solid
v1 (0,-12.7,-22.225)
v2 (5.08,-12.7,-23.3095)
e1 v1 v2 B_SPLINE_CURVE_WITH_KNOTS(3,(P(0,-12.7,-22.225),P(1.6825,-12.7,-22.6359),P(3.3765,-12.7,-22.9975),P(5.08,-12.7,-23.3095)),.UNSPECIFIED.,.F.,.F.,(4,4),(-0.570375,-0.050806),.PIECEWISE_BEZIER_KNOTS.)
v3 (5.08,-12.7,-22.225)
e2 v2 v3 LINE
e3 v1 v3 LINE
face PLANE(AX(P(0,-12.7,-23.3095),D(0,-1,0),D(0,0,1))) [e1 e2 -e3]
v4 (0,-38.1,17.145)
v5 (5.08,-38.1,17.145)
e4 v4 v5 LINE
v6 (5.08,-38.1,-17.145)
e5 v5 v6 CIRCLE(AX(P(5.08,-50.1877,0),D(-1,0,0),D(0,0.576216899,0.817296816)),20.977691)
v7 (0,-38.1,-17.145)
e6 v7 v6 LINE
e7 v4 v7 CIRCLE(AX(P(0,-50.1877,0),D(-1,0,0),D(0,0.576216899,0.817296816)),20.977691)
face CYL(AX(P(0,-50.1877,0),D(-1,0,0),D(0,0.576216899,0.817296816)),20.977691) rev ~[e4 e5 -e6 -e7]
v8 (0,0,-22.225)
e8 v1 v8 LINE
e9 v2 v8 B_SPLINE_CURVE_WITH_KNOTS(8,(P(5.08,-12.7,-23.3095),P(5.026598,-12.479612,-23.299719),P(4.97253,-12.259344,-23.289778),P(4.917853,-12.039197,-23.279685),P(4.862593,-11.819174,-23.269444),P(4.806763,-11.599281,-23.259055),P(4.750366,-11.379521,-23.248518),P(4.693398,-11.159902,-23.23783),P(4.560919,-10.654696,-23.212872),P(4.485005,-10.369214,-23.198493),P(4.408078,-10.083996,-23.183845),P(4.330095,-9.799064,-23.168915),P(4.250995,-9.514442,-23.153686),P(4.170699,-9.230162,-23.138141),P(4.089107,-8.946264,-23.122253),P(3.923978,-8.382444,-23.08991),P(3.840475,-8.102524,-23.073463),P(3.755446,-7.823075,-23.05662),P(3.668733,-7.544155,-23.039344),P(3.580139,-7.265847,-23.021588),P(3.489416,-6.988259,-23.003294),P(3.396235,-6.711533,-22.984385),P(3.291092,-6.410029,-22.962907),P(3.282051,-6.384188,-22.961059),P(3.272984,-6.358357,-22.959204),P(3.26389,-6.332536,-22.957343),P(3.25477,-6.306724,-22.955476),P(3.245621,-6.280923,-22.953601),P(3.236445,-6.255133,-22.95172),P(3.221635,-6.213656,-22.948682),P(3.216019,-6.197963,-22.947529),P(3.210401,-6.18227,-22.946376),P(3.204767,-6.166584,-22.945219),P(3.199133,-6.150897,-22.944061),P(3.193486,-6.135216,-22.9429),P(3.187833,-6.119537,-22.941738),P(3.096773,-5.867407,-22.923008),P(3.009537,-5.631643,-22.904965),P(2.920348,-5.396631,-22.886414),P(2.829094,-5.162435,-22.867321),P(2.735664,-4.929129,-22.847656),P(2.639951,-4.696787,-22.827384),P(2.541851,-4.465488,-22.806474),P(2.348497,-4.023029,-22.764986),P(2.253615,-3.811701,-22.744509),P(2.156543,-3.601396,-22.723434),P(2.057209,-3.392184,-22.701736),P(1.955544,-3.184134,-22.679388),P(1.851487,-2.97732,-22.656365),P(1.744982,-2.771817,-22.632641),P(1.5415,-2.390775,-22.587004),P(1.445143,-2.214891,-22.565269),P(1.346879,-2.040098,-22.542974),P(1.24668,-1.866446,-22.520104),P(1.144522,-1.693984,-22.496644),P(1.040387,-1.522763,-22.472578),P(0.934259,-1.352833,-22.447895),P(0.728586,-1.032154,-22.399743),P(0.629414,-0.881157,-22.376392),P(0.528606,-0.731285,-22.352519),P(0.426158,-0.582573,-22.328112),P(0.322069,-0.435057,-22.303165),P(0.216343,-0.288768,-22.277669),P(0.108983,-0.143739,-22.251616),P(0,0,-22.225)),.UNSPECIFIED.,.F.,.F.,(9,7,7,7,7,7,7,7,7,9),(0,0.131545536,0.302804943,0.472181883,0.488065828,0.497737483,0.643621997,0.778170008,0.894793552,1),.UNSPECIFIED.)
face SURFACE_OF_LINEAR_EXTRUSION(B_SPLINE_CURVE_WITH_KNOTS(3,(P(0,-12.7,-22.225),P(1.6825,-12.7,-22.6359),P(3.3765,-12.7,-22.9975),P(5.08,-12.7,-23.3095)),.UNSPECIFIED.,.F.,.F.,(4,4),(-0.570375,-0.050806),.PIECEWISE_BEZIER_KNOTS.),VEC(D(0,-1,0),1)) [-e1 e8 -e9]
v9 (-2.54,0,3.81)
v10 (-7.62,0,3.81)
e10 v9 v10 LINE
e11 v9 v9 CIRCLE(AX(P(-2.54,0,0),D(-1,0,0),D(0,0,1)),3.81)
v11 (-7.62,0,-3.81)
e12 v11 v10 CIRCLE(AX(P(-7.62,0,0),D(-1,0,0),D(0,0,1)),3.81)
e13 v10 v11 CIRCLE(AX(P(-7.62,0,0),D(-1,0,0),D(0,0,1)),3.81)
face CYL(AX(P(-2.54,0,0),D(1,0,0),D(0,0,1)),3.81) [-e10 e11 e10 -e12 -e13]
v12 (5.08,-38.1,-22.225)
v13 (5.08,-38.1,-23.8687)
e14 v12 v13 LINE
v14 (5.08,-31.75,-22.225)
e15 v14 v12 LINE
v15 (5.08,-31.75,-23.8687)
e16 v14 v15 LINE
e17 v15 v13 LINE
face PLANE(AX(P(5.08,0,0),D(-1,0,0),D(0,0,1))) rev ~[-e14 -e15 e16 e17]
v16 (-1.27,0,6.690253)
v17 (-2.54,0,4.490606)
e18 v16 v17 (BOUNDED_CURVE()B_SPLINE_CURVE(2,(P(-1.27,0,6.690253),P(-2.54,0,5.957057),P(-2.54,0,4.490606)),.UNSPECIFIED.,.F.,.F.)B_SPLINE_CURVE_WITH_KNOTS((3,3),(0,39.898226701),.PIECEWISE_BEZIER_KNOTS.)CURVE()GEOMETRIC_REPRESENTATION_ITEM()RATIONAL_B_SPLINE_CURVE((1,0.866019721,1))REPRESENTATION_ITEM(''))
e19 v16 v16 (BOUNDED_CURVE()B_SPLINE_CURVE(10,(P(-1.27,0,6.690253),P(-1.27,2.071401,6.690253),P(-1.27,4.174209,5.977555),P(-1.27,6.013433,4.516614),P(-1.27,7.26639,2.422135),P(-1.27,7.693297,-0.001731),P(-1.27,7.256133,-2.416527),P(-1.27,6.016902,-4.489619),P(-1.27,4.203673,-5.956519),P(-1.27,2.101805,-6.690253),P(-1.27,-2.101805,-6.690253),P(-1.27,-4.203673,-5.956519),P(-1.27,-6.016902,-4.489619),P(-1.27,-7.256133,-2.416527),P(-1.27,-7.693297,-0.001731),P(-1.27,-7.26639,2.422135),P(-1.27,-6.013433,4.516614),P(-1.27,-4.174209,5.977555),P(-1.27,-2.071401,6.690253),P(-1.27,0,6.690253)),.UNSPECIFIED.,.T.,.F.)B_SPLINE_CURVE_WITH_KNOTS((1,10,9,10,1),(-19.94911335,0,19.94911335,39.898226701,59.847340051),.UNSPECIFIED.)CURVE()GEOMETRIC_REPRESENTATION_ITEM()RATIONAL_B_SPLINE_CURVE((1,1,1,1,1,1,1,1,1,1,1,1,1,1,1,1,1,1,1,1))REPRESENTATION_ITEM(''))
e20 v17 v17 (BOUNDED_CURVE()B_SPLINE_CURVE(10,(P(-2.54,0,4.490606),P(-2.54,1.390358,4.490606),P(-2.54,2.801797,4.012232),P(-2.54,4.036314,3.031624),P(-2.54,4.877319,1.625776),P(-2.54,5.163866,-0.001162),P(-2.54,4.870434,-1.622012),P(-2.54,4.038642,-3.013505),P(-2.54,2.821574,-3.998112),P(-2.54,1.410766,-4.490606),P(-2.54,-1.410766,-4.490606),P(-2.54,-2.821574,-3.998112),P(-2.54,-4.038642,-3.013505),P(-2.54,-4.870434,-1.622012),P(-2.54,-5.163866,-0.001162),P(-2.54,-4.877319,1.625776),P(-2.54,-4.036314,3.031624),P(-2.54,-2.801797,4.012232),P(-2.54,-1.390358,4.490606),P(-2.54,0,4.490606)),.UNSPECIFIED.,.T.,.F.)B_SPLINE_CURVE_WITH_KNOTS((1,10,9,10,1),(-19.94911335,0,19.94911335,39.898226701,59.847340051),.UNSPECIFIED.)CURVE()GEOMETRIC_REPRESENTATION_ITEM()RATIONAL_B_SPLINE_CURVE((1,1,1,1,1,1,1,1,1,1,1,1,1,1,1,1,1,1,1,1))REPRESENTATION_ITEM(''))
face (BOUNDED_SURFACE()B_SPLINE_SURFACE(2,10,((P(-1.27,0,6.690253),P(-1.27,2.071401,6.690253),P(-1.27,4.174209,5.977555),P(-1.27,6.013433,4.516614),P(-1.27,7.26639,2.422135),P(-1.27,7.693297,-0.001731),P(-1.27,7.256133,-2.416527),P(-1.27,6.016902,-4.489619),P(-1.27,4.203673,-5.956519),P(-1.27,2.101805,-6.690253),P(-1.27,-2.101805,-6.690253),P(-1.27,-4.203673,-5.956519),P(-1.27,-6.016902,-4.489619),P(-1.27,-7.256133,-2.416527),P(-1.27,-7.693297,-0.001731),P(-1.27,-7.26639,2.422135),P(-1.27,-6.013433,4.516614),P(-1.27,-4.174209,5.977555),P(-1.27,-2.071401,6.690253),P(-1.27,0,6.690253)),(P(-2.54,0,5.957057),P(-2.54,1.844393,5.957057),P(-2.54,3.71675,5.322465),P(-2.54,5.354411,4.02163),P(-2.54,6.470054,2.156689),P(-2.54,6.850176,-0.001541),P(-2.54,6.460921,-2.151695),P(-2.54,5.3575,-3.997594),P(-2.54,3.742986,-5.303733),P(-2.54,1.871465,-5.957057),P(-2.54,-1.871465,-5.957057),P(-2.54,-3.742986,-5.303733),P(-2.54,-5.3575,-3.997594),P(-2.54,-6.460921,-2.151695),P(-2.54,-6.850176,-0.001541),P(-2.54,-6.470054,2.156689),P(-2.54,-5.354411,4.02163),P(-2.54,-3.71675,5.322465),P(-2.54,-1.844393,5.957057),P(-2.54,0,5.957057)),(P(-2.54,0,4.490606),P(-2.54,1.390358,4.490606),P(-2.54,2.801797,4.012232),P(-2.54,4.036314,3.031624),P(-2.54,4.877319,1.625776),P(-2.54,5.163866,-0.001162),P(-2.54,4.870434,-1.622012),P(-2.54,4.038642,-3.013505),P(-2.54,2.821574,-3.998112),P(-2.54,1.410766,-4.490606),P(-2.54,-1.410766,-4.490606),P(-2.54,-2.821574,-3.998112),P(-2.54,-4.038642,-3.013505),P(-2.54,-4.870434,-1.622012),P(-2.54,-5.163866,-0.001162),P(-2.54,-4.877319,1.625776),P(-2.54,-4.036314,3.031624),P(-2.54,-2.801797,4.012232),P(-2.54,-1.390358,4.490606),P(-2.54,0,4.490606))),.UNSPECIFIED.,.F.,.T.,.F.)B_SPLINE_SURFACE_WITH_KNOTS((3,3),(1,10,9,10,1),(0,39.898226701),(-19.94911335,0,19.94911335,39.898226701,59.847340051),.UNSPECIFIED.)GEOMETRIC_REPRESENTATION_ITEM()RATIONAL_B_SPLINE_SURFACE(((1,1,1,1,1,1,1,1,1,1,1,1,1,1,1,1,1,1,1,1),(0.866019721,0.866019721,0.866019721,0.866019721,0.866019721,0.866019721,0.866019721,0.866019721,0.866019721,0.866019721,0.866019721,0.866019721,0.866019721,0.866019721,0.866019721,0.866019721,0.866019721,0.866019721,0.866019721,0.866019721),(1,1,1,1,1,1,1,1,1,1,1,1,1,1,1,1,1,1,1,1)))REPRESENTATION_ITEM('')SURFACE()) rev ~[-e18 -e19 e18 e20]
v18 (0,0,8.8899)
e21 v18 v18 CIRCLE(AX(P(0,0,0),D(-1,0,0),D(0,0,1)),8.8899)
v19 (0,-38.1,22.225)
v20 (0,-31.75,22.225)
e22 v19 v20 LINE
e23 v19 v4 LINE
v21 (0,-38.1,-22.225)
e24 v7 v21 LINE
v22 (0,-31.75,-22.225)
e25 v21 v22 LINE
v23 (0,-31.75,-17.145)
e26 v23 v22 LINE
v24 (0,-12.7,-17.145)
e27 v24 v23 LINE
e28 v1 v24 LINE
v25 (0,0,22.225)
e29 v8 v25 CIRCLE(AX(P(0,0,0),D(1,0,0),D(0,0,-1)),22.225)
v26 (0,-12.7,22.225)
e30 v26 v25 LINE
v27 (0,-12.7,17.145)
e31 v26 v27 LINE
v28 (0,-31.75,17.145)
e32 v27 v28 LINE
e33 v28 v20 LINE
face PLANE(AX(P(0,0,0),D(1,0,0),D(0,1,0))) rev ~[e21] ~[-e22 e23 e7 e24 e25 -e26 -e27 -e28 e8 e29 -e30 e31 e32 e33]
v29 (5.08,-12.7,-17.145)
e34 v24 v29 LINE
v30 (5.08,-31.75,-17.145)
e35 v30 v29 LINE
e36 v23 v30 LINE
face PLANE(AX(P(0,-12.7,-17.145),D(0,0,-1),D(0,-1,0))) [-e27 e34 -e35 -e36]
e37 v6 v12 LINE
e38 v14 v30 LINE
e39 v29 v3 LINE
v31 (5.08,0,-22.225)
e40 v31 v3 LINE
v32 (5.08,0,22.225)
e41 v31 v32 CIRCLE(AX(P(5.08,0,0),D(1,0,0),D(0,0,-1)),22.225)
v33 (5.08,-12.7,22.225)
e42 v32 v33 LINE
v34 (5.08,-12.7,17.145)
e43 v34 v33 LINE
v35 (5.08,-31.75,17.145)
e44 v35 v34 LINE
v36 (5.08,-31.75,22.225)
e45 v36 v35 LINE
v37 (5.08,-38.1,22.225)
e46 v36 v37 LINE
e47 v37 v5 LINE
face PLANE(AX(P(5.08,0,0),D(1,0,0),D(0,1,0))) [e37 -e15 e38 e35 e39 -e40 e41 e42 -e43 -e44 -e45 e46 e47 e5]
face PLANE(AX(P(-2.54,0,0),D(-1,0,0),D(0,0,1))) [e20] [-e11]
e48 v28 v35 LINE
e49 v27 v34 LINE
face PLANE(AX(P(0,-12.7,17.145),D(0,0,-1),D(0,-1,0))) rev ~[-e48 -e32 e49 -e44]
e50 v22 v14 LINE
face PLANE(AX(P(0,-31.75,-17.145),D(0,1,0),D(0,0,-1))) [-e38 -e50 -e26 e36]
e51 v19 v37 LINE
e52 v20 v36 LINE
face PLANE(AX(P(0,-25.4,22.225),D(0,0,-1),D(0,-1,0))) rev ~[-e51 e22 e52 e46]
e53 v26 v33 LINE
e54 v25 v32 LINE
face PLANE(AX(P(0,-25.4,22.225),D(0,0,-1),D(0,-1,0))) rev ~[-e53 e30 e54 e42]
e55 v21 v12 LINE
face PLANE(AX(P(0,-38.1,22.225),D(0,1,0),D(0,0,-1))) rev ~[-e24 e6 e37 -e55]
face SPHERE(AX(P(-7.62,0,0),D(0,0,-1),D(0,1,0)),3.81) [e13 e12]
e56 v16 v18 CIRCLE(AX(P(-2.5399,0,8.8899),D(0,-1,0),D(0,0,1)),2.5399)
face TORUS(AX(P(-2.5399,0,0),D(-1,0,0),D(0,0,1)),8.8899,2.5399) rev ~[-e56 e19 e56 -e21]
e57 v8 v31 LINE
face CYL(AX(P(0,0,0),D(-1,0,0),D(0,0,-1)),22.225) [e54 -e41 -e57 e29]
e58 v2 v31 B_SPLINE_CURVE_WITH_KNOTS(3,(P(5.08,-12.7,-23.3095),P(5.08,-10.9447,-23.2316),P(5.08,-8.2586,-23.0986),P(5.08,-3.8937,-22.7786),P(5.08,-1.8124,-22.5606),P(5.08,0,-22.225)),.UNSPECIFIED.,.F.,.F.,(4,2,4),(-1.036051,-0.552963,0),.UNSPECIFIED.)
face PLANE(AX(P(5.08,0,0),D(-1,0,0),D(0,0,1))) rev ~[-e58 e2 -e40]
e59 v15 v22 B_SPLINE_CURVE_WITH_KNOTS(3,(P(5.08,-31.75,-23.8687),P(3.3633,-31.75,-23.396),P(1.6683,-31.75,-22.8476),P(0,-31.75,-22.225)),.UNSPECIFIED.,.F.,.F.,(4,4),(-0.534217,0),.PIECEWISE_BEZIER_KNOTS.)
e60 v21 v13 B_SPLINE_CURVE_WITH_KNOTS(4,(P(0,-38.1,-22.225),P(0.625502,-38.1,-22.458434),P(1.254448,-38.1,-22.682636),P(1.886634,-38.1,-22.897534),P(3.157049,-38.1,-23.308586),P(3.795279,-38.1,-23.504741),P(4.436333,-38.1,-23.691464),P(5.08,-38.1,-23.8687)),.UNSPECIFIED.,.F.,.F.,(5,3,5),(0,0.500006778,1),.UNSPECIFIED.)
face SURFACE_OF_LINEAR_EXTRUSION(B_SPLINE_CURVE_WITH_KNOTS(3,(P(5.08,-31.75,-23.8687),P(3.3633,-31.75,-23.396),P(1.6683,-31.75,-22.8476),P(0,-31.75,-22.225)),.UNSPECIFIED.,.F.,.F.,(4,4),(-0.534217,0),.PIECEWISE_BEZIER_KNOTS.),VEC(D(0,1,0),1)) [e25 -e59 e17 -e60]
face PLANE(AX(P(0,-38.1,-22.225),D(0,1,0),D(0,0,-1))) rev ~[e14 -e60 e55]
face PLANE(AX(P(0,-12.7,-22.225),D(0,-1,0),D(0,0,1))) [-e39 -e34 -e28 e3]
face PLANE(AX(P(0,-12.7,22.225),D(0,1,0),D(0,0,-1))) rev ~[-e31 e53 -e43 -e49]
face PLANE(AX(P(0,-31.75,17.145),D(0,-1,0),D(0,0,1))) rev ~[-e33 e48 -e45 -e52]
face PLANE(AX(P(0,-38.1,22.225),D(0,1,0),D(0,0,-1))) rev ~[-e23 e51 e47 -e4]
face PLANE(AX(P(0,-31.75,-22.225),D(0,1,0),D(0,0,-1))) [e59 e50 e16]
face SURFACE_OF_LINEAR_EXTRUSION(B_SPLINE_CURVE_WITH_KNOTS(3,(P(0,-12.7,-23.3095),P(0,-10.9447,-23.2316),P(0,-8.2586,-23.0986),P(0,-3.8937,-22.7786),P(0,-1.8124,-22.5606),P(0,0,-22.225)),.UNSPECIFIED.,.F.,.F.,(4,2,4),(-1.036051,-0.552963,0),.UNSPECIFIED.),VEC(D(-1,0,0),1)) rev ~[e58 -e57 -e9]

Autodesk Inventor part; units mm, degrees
ref_plane "YZ Plane" through (0, 0, 0) normal (1, 0, 0) x (0, 1, 0)
ref_plane "XZ Plane" through (0, 0, 0) normal (0, 1, 0) x (-1, 0, 0)
ref_plane "XY Plane" through (0, 0, 0) normal (0, 0, 1) x (1, 0, 0)
sketch "Sketch1" plane through (0, 0, 0) normal (1, 0, 0) x (0, 1, 0)
  line L0 (-25.4, -22.225) -> (0, -22.225)
  line L1 (0, -22.225) -> (0, 22.225) construction
  line L2 (0, 22.225) -> (-25.4, 22.225)
  line L3 (-25.4, 22.225) -> (-25.4, -22.225) construction
  line L4 (-25.4, 0) -> (0, 0) construction
  arc A0 (0, -22.225) -> (0, 22.225) centre (0, 0) ccw
  circle A1 centre (-25.4, 0) radius 3.81 construction
  circle A2 centre (0, 0) radius 3.81
  line L5 (-25.4, 22.225) -> (-38.1, 22.225)
  line L6 (-38.1, 22.225) -> (-38.1, -22.225)
  line L7 (-38.1, -22.225) -> (-25.4, -22.225)
  line L8 (0, -5.7) -> (0, 5.7) construction
  line L9 (5.6896, 0) -> (-18.1104, 0) construction
  point P0 (0, 0)
  dimension "d0" = 25.4
  dimension "d1" = 44.45
  dimension "d2" = 7.62
  dimension "d3" = 12.7
extrude "Extrusion1" add sketch "Sketch1" along normal blind 5.08 contours L7 L6 L5 L2 A0 L0 | A2
sketch "Sketch2" plane through (0, 0, 0) normal (-1, 0, 0) x (0, 0, 1)
  line L0 (-22.225, -38.1) -> (-22.225, 0) projected
  line L1 (22.225, -38.1) -> (-22.225, -38.1) projected
  line L2 (22.225, 0) -> (22.225, -38.1) projected
  line L3 (-22.225, 0) -> (22.225, 0) construction
  line L4 (-22.225, -12.7) -> (-17.145, -12.7)
  line L5 (-17.145, -12.7) -> (-17.145, -31.75)
  line L6 (-17.145, -31.75) -> (-22.225, -31.75)
  line L7 (-22.225, -31.75) -> (-22.225, -12.7)
  line L8 (22.225, -12.7) -> (17.145, -12.7)
  line L9 (17.145, -12.7) -> (17.145, -31.75)
  line L10 (17.145, -31.75) -> (22.225, -31.75)
  line L11 (22.225, -31.75) -> (22.225, -12.7)
  line L12 (0, -38.1) -> (0, 0)
  dimension "d12" = 38.1
  dimension "d13" = 5.08
  dimension "d14" = 5.08
  dimension "d15" = 19.05
  dimension "d16" = 12.7
extrude "Extrusion2" cut sketch "Sketch2" against normal through all
sketch "Sketch3" plane through (0, 0, 0) normal (-1, 0, 0) x (0, 0, 1)
  arc A0 (22.225, 0) -> (-22.225, 0) centre (0, 0) ccw projected
  circle A1 centre (0, 0) radius 6.35
  dimension "d19" = 12.7
extrude "Extrusion3" add sketch "Sketch3" along normal blind 2.54
sketch "Sketch4" plane through (-2.54, 0, 0) normal (-1, 0, 0) x (0, 0, 1)
  circle A0 centre (0, 0) radius 6.35 projected
  circle A1 centre (0, 0) radius 3.81
  dimension "d22" = 7.62
extrude "Extrusion4" add sketch "Sketch4" along normal blind 5.08 contours A1
sketch "Sketch5" plane through (-7.62, 0, 0) normal (-1, 0, 0) x (0, 0, 1)
  circle A0 centre (0, 0) radius 3.81 projected
  line L0 (-3.81, 0) -> (3.81, 0)
revolve "Revolution1" add sketch "Sketch5" angle 180 about axis through (-7.62, 0, -3.81) along (0, 0, 1) picked at (0.9506, 0.8422) contours L0 A0
sketch "Sketch6" plane through (0, 0, 0) normal (-1, 0, 0) x (0, 0, 1)
  line L0 (-22.225, -38.1) -> (-22.225, -31.75) projected
  line L1 (22.225, -38.1) -> (-22.225, -38.1) projected
  line L2 (-22.225, -12.7) -> (-17.145, -12.7) projected
  line L3 (-17.145, -12.7) -> (-17.145, -31.75) projected
  line L4 (-22.225, -31.75) -> (-23.8687, -31.75)
  spline S0 degree 3 poles (-24.3389, -38.1) (-24.1438, -35.6808) (-23.9932, -34.219) (-23.8687, -31.75) knots -0.835253 -0.835253 -0.835253 -0.835253 -0.05147 -0.05147 -0.05147 -0.05147
  line L5 (-22.225, -38.1) -> (-24.3389, -38.1)
  line L6 (-17.145, -38.1) -> (-17.145, -31.75)
  line L7 (-23.3095, -12.7) -> (-22.225, -12.7)
  line L8 (-17.145, -12.7) -> (-17.145, 0)
  line L9 (-17.145, 0) -> (-22.225, 0)
  spline S1 degree 3 poles (-23.3095, -12.7) (-23.2316, -10.9447) (-23.0986, -8.2586) (-22.7786, -3.8937) (-22.5606, -1.8124) (-22.225, 0) knots -1.036051 -1.036051 -1.036051 -1.036051 -0.552963 -0.552963 0 0 0 0
  line L10 (-22.225, -12.7) -> (-22.225, 0)
  line L11 (-22.225, -31.75) -> (-22.225, -38.1)
  dimension "d26" = 6.35
  dimension "d27" = 6.7237
  dimension "d28" = 7.1939
  dimension "d29" = 12.7
  dimension "d30" = 6.1645
  dimension "d31" = 5.08
extrude "Extrusion5" add sketch "Sketch6" against normal up to surface (5.08 mm away) contours L5 S0 L4 L0 | L7 S1 L10
sketch "Sketch7" plane through (0, -12.7, -17.145) normal (0, -1, 0) x (1, 0, 0)
  line L0 (0, 0) -> (5.08, 0) projected
  line L1 (0, -6.1645) -> (5.08, -6.1645) projected
  line L2 (10.233, 22.3578) -> (10.233, -6.8582) construction
  line L3 (5.08, 0) -> (0, 0)
  line L4 (5.08, -6.1645) -> (5.08, 0)
  spline S0 degree 3 poles (0, -5.08) (1.6825, -5.4909) (3.3765, -5.8525) (5.08, -6.1645) knots -0.570375 -0.570375 -0.570375 -0.570375 -0.050806 -0.050806 -0.050806 -0.050806
  line L5 (0, -5.08) -> (0, 0)
  line L6 (0, 39.37) -> (0, -7.1939) projected
  line L7 (0, -5.08) -> (0, -6.1645)
  line L8 (5.08, -6.1645) -> (0, -6.1645)
  point P0 (0, 17.145)
  dimension "d37" = 5.08
  dimension "d38" = 6.1645
  dimension "d39" = 5.08
extrude "Extrusion6" cut sketch "Sketch7" against normal through all contours S0 L1 L6
sketch "Sketch8" plane through (0, -31.75, -17.145) normal (0, 1, 0) x (1, 0, 0)
  line L0 (0, 0) -> (5.08, 0)
  line L1 (0, 5.08) -> (0, 0)
  spline S0 degree 3 poles (5.08, 6.7237) (3.3633, 6.251) (1.6683, 5.7026) (0, 5.08) knots -0.534217 -0.534217 -0.534217 -0.534217 0 0 0 0
  line L2 (5.08, 0) -> (5.08, 6.7237)
  line L3 (5.08, 6.1645) -> (5.08, 0) projected
  line L4 (0, 0) -> (5.08, 0) projected
  line L5 (5.08, 6.7237) -> (0, 6.7237)
  line L6 (0, 6.7237) -> (0, 5.08)
  line L7 (5.08, 6.7237) -> (5.08, 7.1939) projected
  line L8 (0, 7.1939) -> (5.08, 7.1939) projected
  line L9 (0, 6.7237) -> (0, 7.1939) projected
  line L10 (0, 6.7237) -> (5.08, 6.7237) projected
  line L11 (0, 6.7237) -> (5.08, 6.7237)
  line L12 (5.08, 6.7237) -> (5.08, 7.1939)
  line L13 (5.08, 7.1939) -> (0, 7.1939)
  line L14 (0, 7.1939) -> (0, 6.7237)
  point P0 (0, -17.145)
  dimension "d42" = 5.08
  dimension "d43" = 5.08
  dimension "d44" = 6.7237
extrude "Extrusion7" cut sketch "Sketch8" against normal through all contours L6 L5 S0 | L5 L9 L8 L7
sketch "Sketch9" plane through (0, 0, 0) normal (-1, 0, 0) x (0, 0, 1)
  line L0 (22.225, -38.1) -> (-22.225, -38.1) projected
  line L1 (-17.145, -31.75) -> (-22.225, -31.75) projected
  line L2 (-17.145, -31.75) -> (-17.145, -38.1) construction
  line L3 (17.145, -31.75) -> (17.145, -38.1) construction
  arc A0 (17.145, -38.1) -> (-17.145, -38.1) centre (0, -50.1877) ccw
  line L4 (0, -38.1) -> (0, -29.21) construction
  dimension "d47" = 8.89
extrude "Extrusion8" cut sketch "Sketch9" against normal through all
fillet "Fillet1" radius 2.54 2 edges at (0, 0, -6.35) (-2.54, 0, -6.35)
properties part number "upper_pin"
